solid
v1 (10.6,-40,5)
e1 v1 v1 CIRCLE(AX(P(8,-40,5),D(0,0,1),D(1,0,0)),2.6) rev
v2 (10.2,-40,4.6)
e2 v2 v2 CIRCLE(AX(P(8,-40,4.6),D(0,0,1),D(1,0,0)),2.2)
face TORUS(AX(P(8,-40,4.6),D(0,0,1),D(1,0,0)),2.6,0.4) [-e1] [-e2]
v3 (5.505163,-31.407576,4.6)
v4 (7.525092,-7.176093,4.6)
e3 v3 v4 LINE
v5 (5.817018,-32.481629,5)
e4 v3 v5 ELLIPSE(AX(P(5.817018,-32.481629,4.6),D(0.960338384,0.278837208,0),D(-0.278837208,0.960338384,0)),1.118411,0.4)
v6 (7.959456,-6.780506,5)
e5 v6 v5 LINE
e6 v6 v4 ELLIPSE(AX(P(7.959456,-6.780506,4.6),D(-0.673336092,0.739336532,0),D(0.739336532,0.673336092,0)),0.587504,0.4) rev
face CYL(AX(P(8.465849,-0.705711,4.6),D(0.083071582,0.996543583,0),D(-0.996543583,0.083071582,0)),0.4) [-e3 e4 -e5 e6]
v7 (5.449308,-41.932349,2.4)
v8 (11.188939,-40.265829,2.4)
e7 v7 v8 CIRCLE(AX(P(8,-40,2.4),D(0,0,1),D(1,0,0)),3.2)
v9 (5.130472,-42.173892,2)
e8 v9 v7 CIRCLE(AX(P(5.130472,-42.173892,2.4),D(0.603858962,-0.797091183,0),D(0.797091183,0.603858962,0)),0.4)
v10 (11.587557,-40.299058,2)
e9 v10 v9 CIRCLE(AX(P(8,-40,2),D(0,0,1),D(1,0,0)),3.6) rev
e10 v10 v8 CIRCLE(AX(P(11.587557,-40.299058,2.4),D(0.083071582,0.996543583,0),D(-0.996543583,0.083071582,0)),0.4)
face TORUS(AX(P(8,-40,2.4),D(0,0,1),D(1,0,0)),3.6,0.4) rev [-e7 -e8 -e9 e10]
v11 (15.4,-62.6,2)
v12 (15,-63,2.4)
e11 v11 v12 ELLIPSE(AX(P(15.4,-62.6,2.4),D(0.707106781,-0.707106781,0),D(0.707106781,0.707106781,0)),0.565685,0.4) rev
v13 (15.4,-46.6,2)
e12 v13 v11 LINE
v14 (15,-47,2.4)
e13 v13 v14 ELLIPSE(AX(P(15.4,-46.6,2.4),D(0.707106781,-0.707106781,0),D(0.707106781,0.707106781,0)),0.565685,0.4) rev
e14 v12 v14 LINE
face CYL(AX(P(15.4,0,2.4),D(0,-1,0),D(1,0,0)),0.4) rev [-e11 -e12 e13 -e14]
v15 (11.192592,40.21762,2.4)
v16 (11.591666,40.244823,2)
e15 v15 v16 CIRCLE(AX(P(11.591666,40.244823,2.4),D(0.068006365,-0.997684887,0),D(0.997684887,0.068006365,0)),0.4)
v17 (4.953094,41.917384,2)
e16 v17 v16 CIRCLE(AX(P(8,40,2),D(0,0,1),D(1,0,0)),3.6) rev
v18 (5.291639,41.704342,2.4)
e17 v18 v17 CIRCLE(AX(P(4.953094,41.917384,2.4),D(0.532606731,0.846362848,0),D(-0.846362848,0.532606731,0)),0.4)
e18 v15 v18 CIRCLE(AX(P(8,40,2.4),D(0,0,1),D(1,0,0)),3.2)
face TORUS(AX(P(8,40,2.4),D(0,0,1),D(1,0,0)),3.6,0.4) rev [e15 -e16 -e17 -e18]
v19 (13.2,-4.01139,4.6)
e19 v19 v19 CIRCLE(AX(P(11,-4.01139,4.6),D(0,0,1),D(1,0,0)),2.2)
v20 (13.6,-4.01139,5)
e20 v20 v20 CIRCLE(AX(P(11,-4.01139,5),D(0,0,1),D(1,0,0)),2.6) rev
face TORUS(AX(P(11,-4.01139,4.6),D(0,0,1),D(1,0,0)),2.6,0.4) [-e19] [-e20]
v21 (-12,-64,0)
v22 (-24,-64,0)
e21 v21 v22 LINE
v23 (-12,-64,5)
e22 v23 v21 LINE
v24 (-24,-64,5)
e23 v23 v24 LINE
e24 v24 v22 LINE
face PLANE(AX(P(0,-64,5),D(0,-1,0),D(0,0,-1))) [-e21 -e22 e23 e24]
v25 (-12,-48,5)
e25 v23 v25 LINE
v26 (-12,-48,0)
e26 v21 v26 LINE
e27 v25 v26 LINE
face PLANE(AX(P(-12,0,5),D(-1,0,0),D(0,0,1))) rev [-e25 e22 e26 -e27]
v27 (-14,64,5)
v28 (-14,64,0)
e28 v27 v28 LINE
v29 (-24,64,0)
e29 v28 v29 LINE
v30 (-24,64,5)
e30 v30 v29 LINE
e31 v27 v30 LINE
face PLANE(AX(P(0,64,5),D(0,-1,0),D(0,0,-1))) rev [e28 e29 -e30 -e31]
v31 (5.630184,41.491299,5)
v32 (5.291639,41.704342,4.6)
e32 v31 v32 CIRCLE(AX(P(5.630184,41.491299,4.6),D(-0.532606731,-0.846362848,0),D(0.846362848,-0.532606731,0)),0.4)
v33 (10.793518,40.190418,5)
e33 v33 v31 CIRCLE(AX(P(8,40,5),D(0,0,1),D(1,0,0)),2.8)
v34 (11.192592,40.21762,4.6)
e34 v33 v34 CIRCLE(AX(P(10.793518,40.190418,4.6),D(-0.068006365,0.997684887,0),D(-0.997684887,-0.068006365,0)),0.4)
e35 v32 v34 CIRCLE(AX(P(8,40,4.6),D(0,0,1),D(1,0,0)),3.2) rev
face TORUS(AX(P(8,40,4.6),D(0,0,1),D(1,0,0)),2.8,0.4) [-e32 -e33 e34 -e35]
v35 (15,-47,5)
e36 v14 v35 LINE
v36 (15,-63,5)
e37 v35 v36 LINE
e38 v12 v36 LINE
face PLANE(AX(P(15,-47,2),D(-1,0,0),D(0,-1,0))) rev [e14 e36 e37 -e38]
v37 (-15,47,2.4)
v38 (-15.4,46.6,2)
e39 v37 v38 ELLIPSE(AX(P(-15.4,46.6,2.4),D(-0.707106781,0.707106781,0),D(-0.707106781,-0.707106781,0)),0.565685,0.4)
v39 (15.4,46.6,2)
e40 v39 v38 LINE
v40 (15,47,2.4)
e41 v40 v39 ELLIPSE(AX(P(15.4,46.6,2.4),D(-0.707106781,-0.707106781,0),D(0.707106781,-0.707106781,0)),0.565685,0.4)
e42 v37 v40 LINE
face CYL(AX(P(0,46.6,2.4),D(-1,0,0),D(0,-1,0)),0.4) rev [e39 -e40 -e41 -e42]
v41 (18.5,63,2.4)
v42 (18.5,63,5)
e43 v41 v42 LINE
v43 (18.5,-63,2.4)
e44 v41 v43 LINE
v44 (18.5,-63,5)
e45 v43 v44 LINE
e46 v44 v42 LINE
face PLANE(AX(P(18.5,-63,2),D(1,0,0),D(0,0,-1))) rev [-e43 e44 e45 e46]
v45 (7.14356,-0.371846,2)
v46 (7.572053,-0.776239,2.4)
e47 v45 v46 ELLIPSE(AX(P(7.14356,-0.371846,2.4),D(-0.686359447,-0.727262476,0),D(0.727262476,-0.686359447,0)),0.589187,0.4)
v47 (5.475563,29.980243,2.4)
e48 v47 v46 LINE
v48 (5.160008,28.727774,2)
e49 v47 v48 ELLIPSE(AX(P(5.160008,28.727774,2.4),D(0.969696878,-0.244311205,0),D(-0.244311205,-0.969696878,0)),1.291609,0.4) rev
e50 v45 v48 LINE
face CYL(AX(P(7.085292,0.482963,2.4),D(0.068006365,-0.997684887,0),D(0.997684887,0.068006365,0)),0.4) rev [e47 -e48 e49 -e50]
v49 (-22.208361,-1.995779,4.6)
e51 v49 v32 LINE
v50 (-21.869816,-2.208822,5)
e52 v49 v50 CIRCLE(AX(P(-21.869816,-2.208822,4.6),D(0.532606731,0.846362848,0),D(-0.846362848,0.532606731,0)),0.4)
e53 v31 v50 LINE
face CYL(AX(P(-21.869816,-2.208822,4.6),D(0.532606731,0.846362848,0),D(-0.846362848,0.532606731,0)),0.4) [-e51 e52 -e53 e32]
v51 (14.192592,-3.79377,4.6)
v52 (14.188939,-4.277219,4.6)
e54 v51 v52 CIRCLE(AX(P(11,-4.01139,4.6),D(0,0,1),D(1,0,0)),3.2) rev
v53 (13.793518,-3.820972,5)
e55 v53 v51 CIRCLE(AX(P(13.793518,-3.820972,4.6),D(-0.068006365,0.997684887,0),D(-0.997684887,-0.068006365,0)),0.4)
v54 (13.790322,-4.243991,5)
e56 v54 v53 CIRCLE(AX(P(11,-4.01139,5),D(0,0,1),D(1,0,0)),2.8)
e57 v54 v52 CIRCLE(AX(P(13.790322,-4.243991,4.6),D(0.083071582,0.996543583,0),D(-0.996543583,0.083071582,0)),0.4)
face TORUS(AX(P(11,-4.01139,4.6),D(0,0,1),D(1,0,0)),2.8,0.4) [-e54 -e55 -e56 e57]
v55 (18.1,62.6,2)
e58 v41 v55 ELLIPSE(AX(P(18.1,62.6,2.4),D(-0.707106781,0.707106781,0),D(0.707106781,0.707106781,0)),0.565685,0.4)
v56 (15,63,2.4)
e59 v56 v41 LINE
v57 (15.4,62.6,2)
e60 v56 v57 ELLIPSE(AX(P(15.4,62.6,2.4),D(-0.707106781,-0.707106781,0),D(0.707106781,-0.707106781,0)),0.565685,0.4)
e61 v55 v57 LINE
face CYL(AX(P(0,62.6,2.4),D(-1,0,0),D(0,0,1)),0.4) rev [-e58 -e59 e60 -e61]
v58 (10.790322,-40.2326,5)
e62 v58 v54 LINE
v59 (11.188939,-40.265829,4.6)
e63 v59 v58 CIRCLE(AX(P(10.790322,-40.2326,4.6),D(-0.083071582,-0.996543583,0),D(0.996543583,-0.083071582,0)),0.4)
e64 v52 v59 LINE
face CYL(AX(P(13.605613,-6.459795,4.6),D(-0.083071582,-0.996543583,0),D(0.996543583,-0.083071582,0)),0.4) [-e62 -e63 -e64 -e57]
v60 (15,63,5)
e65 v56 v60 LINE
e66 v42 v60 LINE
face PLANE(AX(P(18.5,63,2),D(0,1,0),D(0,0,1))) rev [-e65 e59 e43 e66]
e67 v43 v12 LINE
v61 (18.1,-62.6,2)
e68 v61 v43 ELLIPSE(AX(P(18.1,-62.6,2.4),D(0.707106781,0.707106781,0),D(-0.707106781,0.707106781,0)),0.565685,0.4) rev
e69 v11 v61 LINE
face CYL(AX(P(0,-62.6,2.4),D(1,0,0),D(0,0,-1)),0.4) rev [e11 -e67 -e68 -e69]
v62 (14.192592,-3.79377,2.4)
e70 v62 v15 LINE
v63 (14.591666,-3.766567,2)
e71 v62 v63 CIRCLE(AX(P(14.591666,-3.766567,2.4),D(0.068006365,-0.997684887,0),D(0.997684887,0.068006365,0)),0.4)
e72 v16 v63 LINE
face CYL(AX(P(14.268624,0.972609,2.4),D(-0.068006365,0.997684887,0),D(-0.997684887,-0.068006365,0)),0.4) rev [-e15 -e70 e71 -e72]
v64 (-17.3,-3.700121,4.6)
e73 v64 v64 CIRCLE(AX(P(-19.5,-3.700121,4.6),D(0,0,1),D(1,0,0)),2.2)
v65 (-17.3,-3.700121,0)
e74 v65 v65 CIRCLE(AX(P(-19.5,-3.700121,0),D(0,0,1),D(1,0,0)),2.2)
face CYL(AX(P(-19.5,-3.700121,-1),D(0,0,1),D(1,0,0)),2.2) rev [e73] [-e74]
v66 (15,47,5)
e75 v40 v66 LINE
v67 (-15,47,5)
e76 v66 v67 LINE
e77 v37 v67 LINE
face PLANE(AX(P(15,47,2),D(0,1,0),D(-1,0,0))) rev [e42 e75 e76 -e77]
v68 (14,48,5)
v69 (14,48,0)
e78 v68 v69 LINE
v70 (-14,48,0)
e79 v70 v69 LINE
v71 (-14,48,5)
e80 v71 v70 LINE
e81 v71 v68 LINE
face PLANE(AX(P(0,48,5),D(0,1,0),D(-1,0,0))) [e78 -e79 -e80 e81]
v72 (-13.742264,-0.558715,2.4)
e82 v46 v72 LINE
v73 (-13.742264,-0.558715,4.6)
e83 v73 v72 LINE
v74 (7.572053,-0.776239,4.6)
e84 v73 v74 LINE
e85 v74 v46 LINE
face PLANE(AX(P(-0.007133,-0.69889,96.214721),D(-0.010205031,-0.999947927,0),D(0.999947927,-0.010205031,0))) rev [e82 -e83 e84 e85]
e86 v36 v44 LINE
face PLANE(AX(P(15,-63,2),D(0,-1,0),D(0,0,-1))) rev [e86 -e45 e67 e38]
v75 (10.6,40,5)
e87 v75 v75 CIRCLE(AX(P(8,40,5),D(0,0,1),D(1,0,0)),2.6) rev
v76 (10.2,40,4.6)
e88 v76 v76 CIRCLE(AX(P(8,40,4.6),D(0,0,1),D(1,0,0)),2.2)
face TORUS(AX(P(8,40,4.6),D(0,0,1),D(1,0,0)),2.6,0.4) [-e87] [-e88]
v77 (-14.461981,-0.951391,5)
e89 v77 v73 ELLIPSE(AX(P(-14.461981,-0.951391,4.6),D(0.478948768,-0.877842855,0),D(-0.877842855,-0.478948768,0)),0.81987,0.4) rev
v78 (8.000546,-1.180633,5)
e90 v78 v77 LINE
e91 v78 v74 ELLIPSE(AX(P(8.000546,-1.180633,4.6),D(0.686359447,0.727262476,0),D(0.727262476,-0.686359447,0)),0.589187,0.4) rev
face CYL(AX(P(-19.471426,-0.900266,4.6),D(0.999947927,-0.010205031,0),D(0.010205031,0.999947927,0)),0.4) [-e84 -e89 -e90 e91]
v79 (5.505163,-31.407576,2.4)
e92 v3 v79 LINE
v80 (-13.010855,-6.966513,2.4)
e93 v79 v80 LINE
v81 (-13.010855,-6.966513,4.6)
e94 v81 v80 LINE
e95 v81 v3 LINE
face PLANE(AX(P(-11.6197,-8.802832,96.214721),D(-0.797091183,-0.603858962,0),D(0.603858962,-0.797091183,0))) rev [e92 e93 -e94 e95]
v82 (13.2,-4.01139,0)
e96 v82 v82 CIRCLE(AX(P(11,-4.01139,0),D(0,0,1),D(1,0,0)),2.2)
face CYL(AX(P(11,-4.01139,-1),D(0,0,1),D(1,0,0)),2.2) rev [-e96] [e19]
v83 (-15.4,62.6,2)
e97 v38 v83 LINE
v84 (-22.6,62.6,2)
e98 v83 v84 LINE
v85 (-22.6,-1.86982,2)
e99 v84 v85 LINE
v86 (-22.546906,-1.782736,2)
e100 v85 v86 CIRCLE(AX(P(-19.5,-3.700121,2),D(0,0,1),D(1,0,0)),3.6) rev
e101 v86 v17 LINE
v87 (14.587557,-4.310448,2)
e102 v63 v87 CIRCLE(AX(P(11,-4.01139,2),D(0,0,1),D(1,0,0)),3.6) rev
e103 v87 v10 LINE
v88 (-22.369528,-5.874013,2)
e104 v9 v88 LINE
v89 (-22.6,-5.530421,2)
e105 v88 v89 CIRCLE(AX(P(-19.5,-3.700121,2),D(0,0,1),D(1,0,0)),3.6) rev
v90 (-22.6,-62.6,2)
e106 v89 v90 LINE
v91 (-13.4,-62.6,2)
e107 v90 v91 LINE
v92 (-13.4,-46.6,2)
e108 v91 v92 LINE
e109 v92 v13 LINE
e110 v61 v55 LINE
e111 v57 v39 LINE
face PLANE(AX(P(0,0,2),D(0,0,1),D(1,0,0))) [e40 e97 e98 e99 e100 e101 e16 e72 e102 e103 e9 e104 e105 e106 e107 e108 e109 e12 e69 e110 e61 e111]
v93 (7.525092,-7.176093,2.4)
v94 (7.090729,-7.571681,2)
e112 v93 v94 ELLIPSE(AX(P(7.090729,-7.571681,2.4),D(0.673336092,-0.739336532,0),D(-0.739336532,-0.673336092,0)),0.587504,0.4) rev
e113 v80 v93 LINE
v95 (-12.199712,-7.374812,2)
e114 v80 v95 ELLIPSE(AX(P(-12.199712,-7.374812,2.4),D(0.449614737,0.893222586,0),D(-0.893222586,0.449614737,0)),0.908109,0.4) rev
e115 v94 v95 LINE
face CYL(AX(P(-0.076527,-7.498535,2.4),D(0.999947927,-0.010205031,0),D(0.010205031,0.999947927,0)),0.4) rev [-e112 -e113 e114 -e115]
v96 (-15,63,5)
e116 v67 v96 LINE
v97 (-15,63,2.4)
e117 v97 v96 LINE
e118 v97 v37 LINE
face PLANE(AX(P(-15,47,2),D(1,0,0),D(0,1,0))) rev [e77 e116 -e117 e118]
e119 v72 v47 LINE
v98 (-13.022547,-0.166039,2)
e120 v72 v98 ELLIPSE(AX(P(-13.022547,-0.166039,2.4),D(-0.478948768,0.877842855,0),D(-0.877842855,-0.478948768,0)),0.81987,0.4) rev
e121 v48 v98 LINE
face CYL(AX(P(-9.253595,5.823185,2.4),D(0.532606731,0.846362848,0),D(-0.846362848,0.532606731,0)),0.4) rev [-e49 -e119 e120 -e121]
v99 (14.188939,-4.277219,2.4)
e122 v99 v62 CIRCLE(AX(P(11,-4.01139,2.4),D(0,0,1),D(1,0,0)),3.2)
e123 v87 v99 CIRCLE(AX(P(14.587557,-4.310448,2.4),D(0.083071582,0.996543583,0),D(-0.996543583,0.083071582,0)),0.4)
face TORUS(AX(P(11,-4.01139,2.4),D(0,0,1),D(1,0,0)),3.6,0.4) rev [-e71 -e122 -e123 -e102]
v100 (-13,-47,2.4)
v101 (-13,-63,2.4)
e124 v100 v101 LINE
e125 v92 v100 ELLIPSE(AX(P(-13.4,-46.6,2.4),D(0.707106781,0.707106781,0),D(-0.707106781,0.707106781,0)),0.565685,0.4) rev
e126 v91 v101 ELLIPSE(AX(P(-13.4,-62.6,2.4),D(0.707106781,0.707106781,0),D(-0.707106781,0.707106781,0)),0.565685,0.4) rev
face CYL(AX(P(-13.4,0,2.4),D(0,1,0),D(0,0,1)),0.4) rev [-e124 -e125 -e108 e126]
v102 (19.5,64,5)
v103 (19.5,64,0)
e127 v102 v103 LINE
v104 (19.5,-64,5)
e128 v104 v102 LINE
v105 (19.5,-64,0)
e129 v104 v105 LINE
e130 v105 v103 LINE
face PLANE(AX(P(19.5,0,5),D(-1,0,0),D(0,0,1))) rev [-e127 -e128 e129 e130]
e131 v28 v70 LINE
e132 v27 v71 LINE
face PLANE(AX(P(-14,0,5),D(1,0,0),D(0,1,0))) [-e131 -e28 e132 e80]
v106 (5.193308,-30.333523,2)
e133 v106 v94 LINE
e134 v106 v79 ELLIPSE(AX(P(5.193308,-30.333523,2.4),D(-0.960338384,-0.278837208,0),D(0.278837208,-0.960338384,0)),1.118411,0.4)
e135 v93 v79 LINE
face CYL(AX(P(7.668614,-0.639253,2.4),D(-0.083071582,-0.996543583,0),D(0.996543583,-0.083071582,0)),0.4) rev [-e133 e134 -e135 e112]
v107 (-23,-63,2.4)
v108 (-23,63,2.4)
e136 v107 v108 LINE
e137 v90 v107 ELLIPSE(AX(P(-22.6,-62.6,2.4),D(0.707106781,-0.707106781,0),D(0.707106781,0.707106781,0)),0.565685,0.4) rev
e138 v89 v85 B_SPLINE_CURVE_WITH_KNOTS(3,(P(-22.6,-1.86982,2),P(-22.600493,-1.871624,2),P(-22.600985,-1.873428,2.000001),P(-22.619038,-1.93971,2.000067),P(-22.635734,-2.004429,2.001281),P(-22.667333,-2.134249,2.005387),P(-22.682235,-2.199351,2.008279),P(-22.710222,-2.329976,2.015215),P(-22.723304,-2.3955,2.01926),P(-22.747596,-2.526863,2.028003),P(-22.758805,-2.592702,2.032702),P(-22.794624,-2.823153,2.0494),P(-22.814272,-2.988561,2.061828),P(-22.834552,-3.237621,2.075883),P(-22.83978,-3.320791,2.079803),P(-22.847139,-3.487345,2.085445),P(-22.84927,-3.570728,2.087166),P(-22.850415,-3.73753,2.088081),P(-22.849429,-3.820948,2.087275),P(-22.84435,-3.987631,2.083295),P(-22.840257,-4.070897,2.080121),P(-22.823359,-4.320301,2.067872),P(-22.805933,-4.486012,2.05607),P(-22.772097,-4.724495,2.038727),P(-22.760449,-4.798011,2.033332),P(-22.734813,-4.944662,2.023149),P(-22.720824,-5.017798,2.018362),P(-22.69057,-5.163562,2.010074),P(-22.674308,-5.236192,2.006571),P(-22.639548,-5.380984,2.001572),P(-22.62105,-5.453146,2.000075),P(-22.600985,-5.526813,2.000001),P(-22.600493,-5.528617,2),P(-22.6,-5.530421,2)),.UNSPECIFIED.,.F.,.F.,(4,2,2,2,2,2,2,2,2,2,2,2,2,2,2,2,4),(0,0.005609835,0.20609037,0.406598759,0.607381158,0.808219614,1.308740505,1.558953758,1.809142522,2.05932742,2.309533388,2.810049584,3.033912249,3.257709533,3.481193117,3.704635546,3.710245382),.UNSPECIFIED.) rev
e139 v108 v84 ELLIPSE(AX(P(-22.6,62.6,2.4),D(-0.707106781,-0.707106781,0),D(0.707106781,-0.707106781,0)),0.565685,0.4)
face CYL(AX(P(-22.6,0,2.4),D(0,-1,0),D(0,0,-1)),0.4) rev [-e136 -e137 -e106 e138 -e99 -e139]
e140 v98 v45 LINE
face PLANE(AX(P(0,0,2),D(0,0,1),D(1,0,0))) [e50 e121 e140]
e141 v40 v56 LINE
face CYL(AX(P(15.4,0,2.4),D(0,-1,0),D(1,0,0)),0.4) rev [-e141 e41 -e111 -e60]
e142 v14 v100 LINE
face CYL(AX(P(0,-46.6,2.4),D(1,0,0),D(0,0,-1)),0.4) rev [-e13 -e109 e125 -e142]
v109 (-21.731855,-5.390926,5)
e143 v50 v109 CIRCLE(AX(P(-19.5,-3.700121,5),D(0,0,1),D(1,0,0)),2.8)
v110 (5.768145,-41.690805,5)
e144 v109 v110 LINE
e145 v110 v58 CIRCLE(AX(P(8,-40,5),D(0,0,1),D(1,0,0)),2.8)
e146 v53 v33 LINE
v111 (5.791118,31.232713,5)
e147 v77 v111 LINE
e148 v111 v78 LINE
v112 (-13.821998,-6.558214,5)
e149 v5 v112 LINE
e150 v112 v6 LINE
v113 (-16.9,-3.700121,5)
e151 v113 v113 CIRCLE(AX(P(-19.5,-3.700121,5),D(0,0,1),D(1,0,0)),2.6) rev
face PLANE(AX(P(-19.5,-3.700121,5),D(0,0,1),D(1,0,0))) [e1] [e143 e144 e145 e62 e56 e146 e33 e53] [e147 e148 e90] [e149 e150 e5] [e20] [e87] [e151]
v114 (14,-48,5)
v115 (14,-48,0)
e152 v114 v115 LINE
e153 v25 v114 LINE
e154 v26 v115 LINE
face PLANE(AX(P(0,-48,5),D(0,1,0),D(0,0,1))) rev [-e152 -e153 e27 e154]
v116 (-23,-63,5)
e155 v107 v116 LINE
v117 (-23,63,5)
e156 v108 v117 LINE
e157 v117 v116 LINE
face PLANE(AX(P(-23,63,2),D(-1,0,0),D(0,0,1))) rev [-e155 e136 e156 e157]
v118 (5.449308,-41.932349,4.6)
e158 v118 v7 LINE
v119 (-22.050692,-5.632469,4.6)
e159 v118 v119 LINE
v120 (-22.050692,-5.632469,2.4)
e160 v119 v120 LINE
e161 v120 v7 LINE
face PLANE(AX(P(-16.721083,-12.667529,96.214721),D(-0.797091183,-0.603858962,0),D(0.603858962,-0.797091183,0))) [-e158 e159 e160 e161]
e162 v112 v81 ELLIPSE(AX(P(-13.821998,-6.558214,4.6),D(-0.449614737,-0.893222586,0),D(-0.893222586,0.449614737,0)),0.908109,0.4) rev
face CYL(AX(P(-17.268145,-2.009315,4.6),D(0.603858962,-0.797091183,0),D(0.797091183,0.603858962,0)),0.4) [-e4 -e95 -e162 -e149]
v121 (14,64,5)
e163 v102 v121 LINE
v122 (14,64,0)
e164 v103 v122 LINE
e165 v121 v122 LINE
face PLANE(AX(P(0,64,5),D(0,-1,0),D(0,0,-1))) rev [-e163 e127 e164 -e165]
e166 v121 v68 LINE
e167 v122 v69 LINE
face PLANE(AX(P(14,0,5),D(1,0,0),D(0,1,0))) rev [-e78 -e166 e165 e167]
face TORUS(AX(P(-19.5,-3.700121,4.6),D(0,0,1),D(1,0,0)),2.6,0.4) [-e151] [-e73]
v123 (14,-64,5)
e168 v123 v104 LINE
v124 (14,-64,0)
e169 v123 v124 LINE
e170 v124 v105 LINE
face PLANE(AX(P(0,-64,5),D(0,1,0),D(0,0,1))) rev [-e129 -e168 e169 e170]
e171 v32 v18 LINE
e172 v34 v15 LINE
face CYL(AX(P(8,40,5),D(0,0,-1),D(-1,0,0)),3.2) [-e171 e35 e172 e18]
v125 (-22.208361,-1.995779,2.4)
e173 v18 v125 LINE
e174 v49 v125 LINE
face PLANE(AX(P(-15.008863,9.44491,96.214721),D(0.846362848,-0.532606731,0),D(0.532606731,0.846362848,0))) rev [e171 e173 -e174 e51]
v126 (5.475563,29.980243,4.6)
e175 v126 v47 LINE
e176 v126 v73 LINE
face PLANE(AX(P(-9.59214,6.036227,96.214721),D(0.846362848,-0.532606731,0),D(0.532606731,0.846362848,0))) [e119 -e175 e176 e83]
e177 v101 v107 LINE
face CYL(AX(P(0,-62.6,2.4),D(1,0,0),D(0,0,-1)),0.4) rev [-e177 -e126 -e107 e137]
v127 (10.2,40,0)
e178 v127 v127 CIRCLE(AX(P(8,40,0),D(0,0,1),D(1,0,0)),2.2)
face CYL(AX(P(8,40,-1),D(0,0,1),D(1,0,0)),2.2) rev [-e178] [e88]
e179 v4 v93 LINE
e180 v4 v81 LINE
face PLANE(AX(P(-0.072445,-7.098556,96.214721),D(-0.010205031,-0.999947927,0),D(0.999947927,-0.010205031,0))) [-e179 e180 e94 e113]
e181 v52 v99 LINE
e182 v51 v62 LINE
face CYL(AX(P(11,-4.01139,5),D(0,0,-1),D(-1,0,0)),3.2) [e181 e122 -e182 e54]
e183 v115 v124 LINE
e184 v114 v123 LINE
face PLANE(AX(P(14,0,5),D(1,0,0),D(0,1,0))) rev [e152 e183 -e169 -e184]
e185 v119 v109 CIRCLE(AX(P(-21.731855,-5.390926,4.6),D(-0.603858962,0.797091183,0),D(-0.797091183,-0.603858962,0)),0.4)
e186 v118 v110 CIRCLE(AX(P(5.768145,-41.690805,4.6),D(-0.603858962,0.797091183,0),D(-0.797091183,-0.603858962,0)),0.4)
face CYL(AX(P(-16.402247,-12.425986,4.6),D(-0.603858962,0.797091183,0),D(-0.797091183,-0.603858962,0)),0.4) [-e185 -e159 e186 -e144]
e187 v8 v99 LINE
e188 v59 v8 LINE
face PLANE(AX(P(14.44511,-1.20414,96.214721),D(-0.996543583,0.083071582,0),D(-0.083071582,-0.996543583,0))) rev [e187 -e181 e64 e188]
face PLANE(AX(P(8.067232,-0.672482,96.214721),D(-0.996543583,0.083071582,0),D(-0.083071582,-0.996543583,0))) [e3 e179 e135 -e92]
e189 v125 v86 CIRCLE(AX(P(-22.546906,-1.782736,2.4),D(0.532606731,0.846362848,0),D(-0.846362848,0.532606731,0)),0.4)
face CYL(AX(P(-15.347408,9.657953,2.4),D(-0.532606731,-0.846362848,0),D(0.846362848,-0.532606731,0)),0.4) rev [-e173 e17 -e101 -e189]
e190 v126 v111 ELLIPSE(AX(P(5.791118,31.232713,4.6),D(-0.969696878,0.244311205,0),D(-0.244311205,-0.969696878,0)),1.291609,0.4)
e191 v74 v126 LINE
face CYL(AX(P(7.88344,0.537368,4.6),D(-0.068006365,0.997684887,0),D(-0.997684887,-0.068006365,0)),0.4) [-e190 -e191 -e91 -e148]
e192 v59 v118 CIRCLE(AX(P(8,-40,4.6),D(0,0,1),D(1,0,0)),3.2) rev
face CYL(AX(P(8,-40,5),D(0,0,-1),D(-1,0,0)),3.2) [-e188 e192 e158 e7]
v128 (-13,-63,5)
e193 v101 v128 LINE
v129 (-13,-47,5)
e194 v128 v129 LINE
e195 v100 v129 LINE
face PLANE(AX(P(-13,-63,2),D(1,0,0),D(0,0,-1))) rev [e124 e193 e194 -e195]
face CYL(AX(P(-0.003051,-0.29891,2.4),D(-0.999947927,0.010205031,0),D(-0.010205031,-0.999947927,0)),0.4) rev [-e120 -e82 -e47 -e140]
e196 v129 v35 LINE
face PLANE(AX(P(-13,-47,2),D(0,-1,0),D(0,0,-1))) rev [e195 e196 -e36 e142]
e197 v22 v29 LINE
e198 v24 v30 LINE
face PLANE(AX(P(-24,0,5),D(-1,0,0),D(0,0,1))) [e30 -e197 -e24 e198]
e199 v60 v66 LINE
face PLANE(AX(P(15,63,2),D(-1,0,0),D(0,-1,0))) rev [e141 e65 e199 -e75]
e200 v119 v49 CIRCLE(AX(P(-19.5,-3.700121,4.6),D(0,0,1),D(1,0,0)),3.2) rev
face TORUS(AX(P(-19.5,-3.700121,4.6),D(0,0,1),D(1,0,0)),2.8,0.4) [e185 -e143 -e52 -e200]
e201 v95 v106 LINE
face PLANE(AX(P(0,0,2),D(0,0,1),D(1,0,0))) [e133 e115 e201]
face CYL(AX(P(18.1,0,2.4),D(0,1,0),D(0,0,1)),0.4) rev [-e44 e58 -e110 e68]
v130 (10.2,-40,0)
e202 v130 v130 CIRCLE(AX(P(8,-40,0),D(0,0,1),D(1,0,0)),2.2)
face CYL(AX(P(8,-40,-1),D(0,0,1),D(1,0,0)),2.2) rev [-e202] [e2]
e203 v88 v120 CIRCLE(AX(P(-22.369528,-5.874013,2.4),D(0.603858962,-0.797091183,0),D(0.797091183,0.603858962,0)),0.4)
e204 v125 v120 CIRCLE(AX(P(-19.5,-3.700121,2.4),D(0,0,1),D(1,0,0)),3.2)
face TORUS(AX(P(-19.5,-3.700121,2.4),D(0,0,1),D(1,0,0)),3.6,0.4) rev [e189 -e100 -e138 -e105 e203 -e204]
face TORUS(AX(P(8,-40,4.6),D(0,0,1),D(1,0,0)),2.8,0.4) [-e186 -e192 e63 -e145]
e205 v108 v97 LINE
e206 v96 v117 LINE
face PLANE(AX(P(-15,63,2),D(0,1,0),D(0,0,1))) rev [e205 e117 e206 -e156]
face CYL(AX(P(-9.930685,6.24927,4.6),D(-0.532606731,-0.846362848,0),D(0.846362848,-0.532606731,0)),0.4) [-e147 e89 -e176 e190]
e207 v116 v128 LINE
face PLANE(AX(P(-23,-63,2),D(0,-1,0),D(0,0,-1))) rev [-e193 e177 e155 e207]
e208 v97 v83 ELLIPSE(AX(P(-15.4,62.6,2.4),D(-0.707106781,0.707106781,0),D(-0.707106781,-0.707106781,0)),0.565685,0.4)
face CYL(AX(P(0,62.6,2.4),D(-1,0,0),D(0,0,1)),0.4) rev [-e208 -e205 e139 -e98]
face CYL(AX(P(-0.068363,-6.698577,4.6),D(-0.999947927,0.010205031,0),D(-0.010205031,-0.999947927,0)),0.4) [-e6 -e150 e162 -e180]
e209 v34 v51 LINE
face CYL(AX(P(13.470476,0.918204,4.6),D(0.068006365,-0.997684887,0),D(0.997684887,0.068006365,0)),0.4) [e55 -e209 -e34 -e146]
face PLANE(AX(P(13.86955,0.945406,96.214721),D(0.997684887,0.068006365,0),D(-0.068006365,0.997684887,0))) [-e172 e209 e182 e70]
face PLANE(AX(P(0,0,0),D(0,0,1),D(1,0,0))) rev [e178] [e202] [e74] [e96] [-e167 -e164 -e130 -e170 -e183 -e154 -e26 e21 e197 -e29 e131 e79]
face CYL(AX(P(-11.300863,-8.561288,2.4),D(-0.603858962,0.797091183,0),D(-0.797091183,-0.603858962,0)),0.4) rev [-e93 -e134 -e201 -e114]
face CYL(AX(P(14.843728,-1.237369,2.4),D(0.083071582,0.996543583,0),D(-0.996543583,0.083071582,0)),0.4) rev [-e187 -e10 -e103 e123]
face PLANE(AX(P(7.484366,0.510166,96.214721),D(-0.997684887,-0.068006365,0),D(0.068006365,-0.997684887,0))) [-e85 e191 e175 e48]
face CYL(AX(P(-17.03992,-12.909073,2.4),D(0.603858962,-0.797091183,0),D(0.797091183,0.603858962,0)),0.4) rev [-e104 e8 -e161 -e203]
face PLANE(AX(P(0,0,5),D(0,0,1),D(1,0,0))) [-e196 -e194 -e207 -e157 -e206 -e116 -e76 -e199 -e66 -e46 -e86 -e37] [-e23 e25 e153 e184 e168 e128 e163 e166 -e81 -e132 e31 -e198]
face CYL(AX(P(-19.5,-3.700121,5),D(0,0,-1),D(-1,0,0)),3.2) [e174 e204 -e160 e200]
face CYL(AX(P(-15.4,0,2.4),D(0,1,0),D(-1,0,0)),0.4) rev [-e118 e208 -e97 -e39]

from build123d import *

# Parameters (mm, degrees)
ESQUISSE1_R             = 2
ESQUISSE1_R_2           = 1.996346106
BOSS_EXTRU_2_DEPTH      = 5
ENL_V_MAT_EXTRU_1_DEPTH = 3
ESQUISSE3_R             = 2.2
ENL_V_MAT_EXTRU_2_DEPTH = 3
BOSS_EXTRU_3_START      = 3
ESQUISSE4_R             = 3.2
ESQUISSE4_R_2           = 2.2
BOSS_EXTRU_3_DEPTH      = 3
BOSS_EXTRU_4_START      = 3
BOSS_EXTRU_4_DEPTH      = 3
CONG_1_R                = 0.4
CONG_2_R                = 0.4
CONG_3_R                = 0.4


with BuildPart() as part:
    # Esquisse1 → Boss.-Extru.2 (new body)
    with BuildSketch(Plane.XY):
        Polygon((14, -48), (14, -64), (19.5, -64), (19.5, 64), (14, 64), (14, 48), (-14, 48), (-14, 64), (-24, 64), (-24, -3.700120509), (-24, -64), (-12, -64), (-12, -48), align=None)
        with Locations((11, -4.011390176)):
            Circle(ESQUISSE1_R, mode=Mode.SUBTRACT)
        with Locations((-19.5, -3.700120509)):
            Circle(ESQUISSE1_R_2, mode=Mode.SUBTRACT)
    extrude(amount=BOSS_EXTRU_2_DEPTH)

    # Esquisse2 → Enlèv. mat.-Extru.1 (cut)
    with BuildSketch(Plane.XY.offset(5)):
        Polygon((15, 63), (15, 47), (-15, 47), (-15, 63), (-23, 63), (-23, -63), (-13, -63), (-13, -47), (15, -47), (15, -63), (18.5, -63), (18.5, 63), align=None)
    extrude(amount=-ENL_V_MAT_EXTRU_1_DEPTH, mode=Mode.SUBTRACT)

    # Esquisse3 → Enlèv. mat.-Extru.2 (cut)
    with BuildSketch(Plane.XY.offset(2)):
        with Locations((8, -40)):
            Circle(ESQUISSE3_R)
        with Locations((11, -4.011390176)):
            Circle(ESQUISSE3_R)
        with Locations((-19.5, -3.700120509)):
            Circle(ESQUISSE3_R)
        with Locations((8, 40)):
            Circle(ESQUISSE3_R)
    extrude(amount=-ENL_V_MAT_EXTRU_2_DEPTH, mode=Mode.SUBTRACT)

    # Esquisse4 → Boss.-Extru.3 (add)
    # profile 1 of 4: a face of its own
    with BuildSketch(Plane.XY.offset(2).offset(BOSS_EXTRU_3_START)):
        with Locations((-19.5, -3.700120509)):
            Circle(ESQUISSE4_R)
        with Locations((-19.5, -3.700120509)):
            Circle(ESQUISSE4_R_2, mode=Mode.SUBTRACT)
    # profile 2 of 4: a face of its own
    with BuildSketch(Plane.XY.offset(2).offset(BOSS_EXTRU_3_START)):
        with Locations((8, 40)):
            Circle(ESQUISSE4_R)
        with Locations((8, 40)):
            Circle(ESQUISSE4_R_2, mode=Mode.SUBTRACT)
    # profile 3 of 4: a face of its own
    with BuildSketch(Plane.XY.offset(2).offset(BOSS_EXTRU_3_START)):
        with Locations((11, -4.011390176)):
            Circle(ESQUISSE4_R)
        with Locations((11, -4.011390176)):
            Circle(ESQUISSE4_R_2, mode=Mode.SUBTRACT)
    # profile 4 of 4: a face of its own
    with BuildSketch(Plane.XY.offset(2).offset(BOSS_EXTRU_3_START)):
        with Locations((8, -40)):
            Circle(ESQUISSE4_R)
        with Locations((8, -40)):
            Circle(ESQUISSE4_R_2, mode=Mode.SUBTRACT)
    extrude(amount=-BOSS_EXTRU_3_DEPTH)

    # Esquisse5 → Boss.-Extru.4 (add)
    with BuildSketch(Plane.XY.offset(2).offset(BOSS_EXTRU_4_START)):
        with BuildLine():
            Line((-22.050691786, -5.632469186), (5.449308214, -41.932348677))
            ThreePointArc((5.449308214, -41.932348677), (6.980738924, -36.966667368), (11.2, -40))
            ThreePointArc((11.2, -40), (11.19723367, -40.133029532), (11.188939465, -40.265829062))
            Line((11.188939465, -40.265829062), (14.188939468, -4.277219196))
            ThreePointArc((14.188939468, -4.277219196), (7.800091306, -3.987216857), (14.192591629, -3.793769652))
            Line((14.192591629, -3.793769652), (11.192591639, 40.217620368))
            ThreePointArc((11.192591639, 40.217620368), (11.198147374, 40.108873216), (11.2, 40))
            ThreePointArc((11.2, 40), (7.113082744, 36.925365423), (5.291638887, 41.704341538))
            Line((5.291638887, 41.704341538), (-22.208361113, -1.995778971))
            ThreePointArc((-22.208361113, -1.995778971), (-18.613082744, -0.625485932), (-16.3, -3.700120509))
            ThreePointArc((-16.3, -3.700120509), (-18.480738924, -6.733453141), (-22.050691786, -5.632469186))
        make_face()
        Polygon((7.525092364, -7.176093429), (5.505163093, -31.407575558), (-13.010855219, -6.966512525), align=None, mode=Mode.SUBTRACT)
        Polygon((-13.742264019, -0.558714804), (5.475562867, 29.980243408), (7.572053073, -0.776239407), align=None, mode=Mode.SUBTRACT)
    extrude(amount=-BOSS_EXTRU_4_DEPTH)

    # Congé1
    cong_1_edges = [part.edges().sort_by_distance(p)[0] for p in [
        (-22.69699676, -3.838726851, 5),
        (-21.7, -3.700120509, 5),
        (8.781795856, 43.103030009, 5),
        (5.8, 40, 5),
        (8.8, -4.011390176, 5),
        (8.892279066, -43.073082828, 5),
        (5.8, -40, 5),
        (14.199908694, -4.035563495, 5),
        (-4.133350576, 14.710764302, 5),
        (6.52380797, 14.602002001, 5),
        (-2.742881428, -7.071302977, 5),
        (6.515127729, -19.291834493, 5),
        (12.692591634, 18.211925358, 5),
        (-8.300691786, -23.782408932, 5),
        (-3.085105473, -0.667477105, 5),
        (-3.752846063, -19.187044042, 5),
        (-8.458361113, 19.854281284, 5),
        (12.688939466, -22.271524129, 5),
    ]]
    fillet(cong_1_edges, radius=CONG_1_R)

    # Congé2
    # the kernel refuses this fillet: 0.4 mm, written as the material it adds along each edge
    with BuildSketch(Plane(origin=(-19.5, -3.700120509, 2), x_dir=(-0.8463628479272527, 0.5326067307577611, 0), z_dir=(0.5326067307577611, 0.8463628479272527, 0))) as cong_2_piece_1:
        with BuildLine():
            CenterArc((3.2 + CONG_2_R, CONG_2_R), CONG_2_R, 180, 90)
            Line((3.2 + CONG_2_R, 0), (3.2, 0))
            Line((3.2, 0), (3.2, CONG_2_R))
        make_face()
    revolve(axis=Axis((-19.5, -3.700120509, 2), (0, 0, 1)), revolution_arc=69.328529156)
    with BuildSketch(Plane(origin=(8, 40, 2), x_dir=(0.9976848872903038, 0.06800636494133182, 0), z_dir=(0.06800636494133182, -0.9976848872903038, 0))) as cong_2_piece_2:
        with BuildLine():
            CenterArc((3.2 + CONG_2_R, CONG_2_R), CONG_2_R, 180, 90)
            Line((3.2, CONG_2_R), (3.2, 0))
            Line((3.2, 0), (3.2 + CONG_2_R, 0))
        make_face()
    revolve(axis=Axis((8, 40, 2), (0, 0, 1)), revolution_arc=143.918761689)
    with BuildSketch(Plane(origin=(8, -40, 2), x_dir=(-0.7970911832328035, -0.6038589616893412, 0), z_dir=(-0.6038589616893412, 0.7970911832328035, 0))) as cong_2_piece_3:
        with BuildLine():
            CenterArc((3.2 + CONG_2_R, CONG_2_R), CONG_2_R, 180, 90)
            Line((3.2, CONG_2_R), (3.2, 0))
            Line((3.2, 0), (3.2 + CONG_2_R, 0))
        make_face()
    revolve(axis=Axis((8, -40, 2), (0, 0, 1)), revolution_arc=138.088079335)
    with BuildSketch(Plane(origin=(11, -4.011390176, 2), x_dir=(0.9976848839692785, 0.06800641366229479, 0), z_dir=(-0.06800641366229479, 0.9976848839692785, 0))) as cong_2_piece_4:
        with BuildLine():
            CenterArc((3.2 + CONG_2_R, -CONG_2_R), CONG_2_R, 90, 90)
            Line((3.2, -CONG_2_R), (3.2, 0))
            Line((3.2, 0), (3.2 + CONG_2_R, 0))
        make_face()
    revolve(axis=Axis((11, -4.011390176, 2), (0, 0, -1)), revolution_arc=8.664631865)
    with BuildSketch(Plane(origin=(14.192591629, -3.793769652, 2), x_dir=(0.9976848872903039, 0.06800636494133225, -1.1102230246251585e-15), z_dir=(-0.06800636494133225, 0.9976848872903039, 0))) as cong_2_piece_5:
        with BuildLine():
            CenterArc((CONG_2_R, -CONG_2_R), CONG_2_R, 90, 90)
            Line((0, -CONG_2_R), (0, 0))
            Line((0, 0), (CONG_2_R, 0))
        make_face()
    extrude(amount=44.113517786)
    with BuildSketch(Plane(origin=(-22.050691786, -5.632469186, 2), x_dir=(0, 0, 1), z_dir=(0.6038589616893416, -0.7970911832328034, 0))) as cong_2_piece_6:
        with BuildLine():
            CenterArc((CONG_2_R, CONG_2_R), CONG_2_R, 180, 90)
            Line((0, CONG_2_R), (0, 0))
            Line((0, 0), (CONG_2_R, 0))
        make_face()
    extrude(amount=45.540435341)
    with BuildSketch(Plane(origin=(11.188939465, -40.265829062, 2), x_dir=(0.9965435827308107, -0.08307158189200477, -1.110223024625156e-15), z_dir=(0.08307158189200475, 0.9965435827308107, 0))) as cong_2_piece_7:
        with BuildLine():
            CenterArc((CONG_2_R, -CONG_2_R), CONG_2_R, 90, 90)
            Line((0, -CONG_2_R), (0, 0))
            Line((0, 0), (CONG_2_R, 0))
        make_face()
    extrude(amount=36.113432959)
    with BuildSketch(Plane(origin=(5.291638887, 41.704341538, 2), x_dir=(-0.8463628479272527, 0.5326067307577608, -1.1102230246251546e-15), z_dir=(-0.5326067307577609, -0.8463628479272528, 0))) as cong_2_piece_8:
        with BuildLine():
            CenterArc((CONG_2_R, -CONG_2_R), CONG_2_R, 90, 90)
            Line((0, -CONG_2_R), (0, 0))
            Line((0, 0), (CONG_2_R, 0))
        make_face()
    extrude(amount=51.632843545)
    with BuildSketch(Plane(origin=(19.5, 63, 2), x_dir=(0, -1, 0), z_dir=(-1, 0, 0)), Plane(origin=(14, -63, 2), x_dir=(0, 1, 0), z_dir=(1, 0, 0))) as cong_2_piece_9:
        with BuildLine():
            CenterArc((CONG_2_R, CONG_2_R), CONG_2_R, 180, 90)
            Line((0, CONG_2_R), (0, 0))
            Line((0, 0), (CONG_2_R, 0))
        make_face()
    extrude(amount=5.5)
    with BuildSketch(Plane(origin=(18.5, -64, 2), x_dir=(-1, 0, 0), z_dir=(0, 1, 0)), Plane(origin=(-23, 64, 2), x_dir=(1, 0, 0), z_dir=(0, -1, 0))) as cong_2_piece_10:
        with BuildLine():
            CenterArc((CONG_2_R, CONG_2_R), CONG_2_R, 180, 90)
            Line((0, CONG_2_R), (0, 0))
            Line((0, 0), (CONG_2_R, 0))
        make_face()
    extrude(amount=128)
    with BuildSketch(Plane(origin=(15, -47, 2), x_dir=(1, 0, 0), z_dir=(0, -1, 0)), Plane(origin=(-13, -64, 2), x_dir=(-1, 0, 0), z_dir=(0, 1, 0)), Plane(origin=(-15, 47, 2), x_dir=(-1, 0, 0), z_dir=(0, 1, 0)), Plane(origin=(15, 64, 2), x_dir=(1, 0, 0), z_dir=(0, -1, 0))) as cong_2_piece_11:
        with BuildLine():
            CenterArc((CONG_2_R, CONG_2_R), CONG_2_R, 180, 90)
            Line((0, CONG_2_R), (0, 0))
            Line((0, 0), (CONG_2_R, 0))
        make_face()
    extrude(amount=17)
    with BuildSketch(Plane(origin=(-13, -47, 2), x_dir=(0, 1, 0), z_dir=(1, 0, 0))) as cong_2_piece_12:
        with BuildLine():
            CenterArc((CONG_2_R, CONG_2_R), CONG_2_R, 180, 90)
            Line((0, CONG_2_R), (0, 0))
            Line((0, 0), (CONG_2_R, 0))
        make_face()
    extrude(amount=28)
    with BuildSketch(Plane(origin=(-24, -63, 2), x_dir=(0, 1, 0), z_dir=(1, 0, 0))) as cong_2_piece_13:
        with BuildLine():
            CenterArc((CONG_2_R, CONG_2_R), CONG_2_R, 180, 90)
            Line((0, CONG_2_R), (0, 0))
            Line((0, 0), (CONG_2_R, 0))
        make_face()
    extrude(amount=12)
    with BuildSketch(Plane(origin=(-14, 63, 2), x_dir=(0, -1, 0), z_dir=(-1, 0, 0))) as cong_2_piece_14:
        with BuildLine():
            CenterArc((CONG_2_R, CONG_2_R), CONG_2_R, 180, 90)
            Line((0, CONG_2_R), (0, 0))
            Line((0, 0), (CONG_2_R, 0))
        make_face()
    extrude(amount=10)
    with BuildSketch(Plane(origin=(15, 47, 2), x_dir=(0, -1, 0), z_dir=(-1, 0, 0))) as cong_2_piece_15:
        with BuildLine():
            CenterArc((CONG_2_R, CONG_2_R), CONG_2_R, 180, 90)
            Line((0, CONG_2_R), (0, 0))
            Line((0, 0), (CONG_2_R, 0))
        make_face()
    extrude(amount=30)
    with BuildSketch(Plane(origin=(-13, -47, 2), x_dir=(0, 1, 0), z_dir=(1, 0, 0))) as cong_2_piece_16a_section:
        with BuildLine():
            CenterArc((CONG_2_R, CONG_2_R), CONG_2_R, 180, 90)
            Line((0, CONG_2_R), (0, 0))
            Line((0, 0), (CONG_2_R, 0))
        make_face()
    cong_2_piece_16a = extrude(amount=29, mode=Mode.PRIVATE)
    cong_2_piece_16a = split(cong_2_piece_16a, bisect_by=Plane(origin=(15, -46.909441954, 2.090558046), z_dir=(1, 0, 0)), keep=Keep.TOP, mode=Mode.PRIVATE)
    with BuildSketch(Plane(origin=(15, -46, 2), x_dir=(1, 0, 0), z_dir=(0, -1, 0))) as cong_2_piece_16b_section:
        with BuildLine():
            CenterArc((CONG_2_R, CONG_2_R), CONG_2_R, 180, 90)
            Line((0, CONG_2_R), (0, 0))
            Line((0, 0), (CONG_2_R, 0))
        make_face()
    cong_2_piece_16b = extrude(amount=17, mode=Mode.PRIVATE)
    cong_2_piece_16b = split(cong_2_piece_16b, bisect_by=Plane(origin=(15.090558046, -47, 2.090558046), z_dir=(0, 1, 0)), keep=Keep.TOP, mode=Mode.PRIVATE)
    cong_2_piece_16 = cong_2_piece_16a & cong_2_piece_16b
    add(cong_2_piece_16)
    with BuildSketch(Plane(origin=(-13, -63, 2), x_dir=(-1, 0, 0), z_dir=(0, 1, 0))) as cong_2_piece_17a_section:
        with BuildLine():
            CenterArc((CONG_2_R, CONG_2_R), CONG_2_R, 180, 90)
            Line((0, CONG_2_R), (0, 0))
            Line((0, 0), (CONG_2_R, 0))
        make_face()
    cong_2_piece_17a = extrude(amount=17, mode=Mode.PRIVATE)
    cong_2_piece_17a = split(cong_2_piece_17a, bisect_by=Plane(origin=(-13.090558046, -47, 2.090558046), z_dir=(0, 1, 0)), keep=Keep.TOP, mode=Mode.PRIVATE)
    with BuildSketch(Plane(origin=(-14, -47, 2), x_dir=(0, 1, 0), z_dir=(1, 0, 0))) as cong_2_piece_17b_section:
        with BuildLine():
            CenterArc((CONG_2_R, CONG_2_R), CONG_2_R, 180, 90)
            Line((0, CONG_2_R), (0, 0))
            Line((0, 0), (CONG_2_R, 0))
        make_face()
    cong_2_piece_17b = extrude(amount=29, mode=Mode.PRIVATE)
    cong_2_piece_17b = split(cong_2_piece_17b, bisect_by=Plane(origin=(-13, -46.909441954, 2.090558046), z_dir=(-1, 0, 0)), keep=Keep.TOP, mode=Mode.PRIVATE)
    cong_2_piece_17 = cong_2_piece_17a & cong_2_piece_17b
    add(cong_2_piece_17)
    with BuildSketch(Plane(origin=(15, 47, 2), x_dir=(0, -1, 0), z_dir=(-1, 0, 0))) as cong_2_piece_18a_section:
        with BuildLine():
            CenterArc((CONG_2_R, CONG_2_R), CONG_2_R, 180, 90)
            Line((0, CONG_2_R), (0, 0))
            Line((0, 0), (CONG_2_R, 0))
        make_face()
    cong_2_piece_18a = extrude(amount=31, mode=Mode.PRIVATE)
    cong_2_piece_18a = split(cong_2_piece_18a, bisect_by=Plane(origin=(-15, 46.909441954, 2.090558046), z_dir=(-1, 0, 0)), keep=Keep.TOP, mode=Mode.PRIVATE)
    with BuildSketch(Plane(origin=(-15, 46, 2), x_dir=(-1, 0, 0), z_dir=(0, 1, 0))) as cong_2_piece_18b_section:
        with BuildLine():
            CenterArc((CONG_2_R, CONG_2_R), CONG_2_R, 180, 90)
            Line((0, CONG_2_R), (0, 0))
            Line((0, 0), (CONG_2_R, 0))
        make_face()
    cong_2_piece_18b = extrude(amount=17, mode=Mode.PRIVATE)
    cong_2_piece_18b = split(cong_2_piece_18b, bisect_by=Plane(origin=(-15.090558046, 47, 2.090558046), z_dir=(0, -1, 0)), keep=Keep.TOP, mode=Mode.PRIVATE)
    cong_2_piece_18 = cong_2_piece_18a & cong_2_piece_18b
    add(cong_2_piece_18)
    with BuildSketch(Plane(origin=(15, 63, 2), x_dir=(1, 0, 0), z_dir=(0, -1, 0))) as cong_2_piece_19a_section:
        with BuildLine():
            CenterArc((CONG_2_R, CONG_2_R), CONG_2_R, 180, 90)
            Line((0, CONG_2_R), (0, 0))
            Line((0, 0), (CONG_2_R, 0))
        make_face()
    cong_2_piece_19a = extrude(amount=17, mode=Mode.PRIVATE)
    cong_2_piece_19a = split(cong_2_piece_19a, bisect_by=Plane(origin=(15.090558046, 47, 2.090558046), z_dir=(0, -1, 0)), keep=Keep.TOP, mode=Mode.PRIVATE)
    with BuildSketch(Plane(origin=(16, 47, 2), x_dir=(0, -1, 0), z_dir=(-1, 0, 0))) as cong_2_piece_19b_section:
        with BuildLine():
            CenterArc((CONG_2_R, CONG_2_R), CONG_2_R, 180, 90)
            Line((0, CONG_2_R), (0, 0))
            Line((0, 0), (CONG_2_R, 0))
        make_face()
    cong_2_piece_19b = extrude(amount=31, mode=Mode.PRIVATE)
    cong_2_piece_19b = split(cong_2_piece_19b, bisect_by=Plane(origin=(15, 46.909441954, 2.090558046), z_dir=(1, 0, 0)), keep=Keep.TOP, mode=Mode.PRIVATE)
    cong_2_piece_19 = cong_2_piece_19a & cong_2_piece_19b
    add(cong_2_piece_19)

    # Congé3
    cong_3_edges = [part.edges().sort_by_distance(p)[0] for p in [
        (-3.085105473, -0.667477105, 2),
        (-3.752846063, -19.187044042, 2),
        (6.515127729, -19.291834493, 2),
        (-2.742881428, -7.071302977, 2),
        (6.52380797, 14.602002001, 2),
        (-4.133350576, 14.710764302, 2),
    ]]
    fillet(cong_3_edges, radius=CONG_3_R)


solid = part.part
